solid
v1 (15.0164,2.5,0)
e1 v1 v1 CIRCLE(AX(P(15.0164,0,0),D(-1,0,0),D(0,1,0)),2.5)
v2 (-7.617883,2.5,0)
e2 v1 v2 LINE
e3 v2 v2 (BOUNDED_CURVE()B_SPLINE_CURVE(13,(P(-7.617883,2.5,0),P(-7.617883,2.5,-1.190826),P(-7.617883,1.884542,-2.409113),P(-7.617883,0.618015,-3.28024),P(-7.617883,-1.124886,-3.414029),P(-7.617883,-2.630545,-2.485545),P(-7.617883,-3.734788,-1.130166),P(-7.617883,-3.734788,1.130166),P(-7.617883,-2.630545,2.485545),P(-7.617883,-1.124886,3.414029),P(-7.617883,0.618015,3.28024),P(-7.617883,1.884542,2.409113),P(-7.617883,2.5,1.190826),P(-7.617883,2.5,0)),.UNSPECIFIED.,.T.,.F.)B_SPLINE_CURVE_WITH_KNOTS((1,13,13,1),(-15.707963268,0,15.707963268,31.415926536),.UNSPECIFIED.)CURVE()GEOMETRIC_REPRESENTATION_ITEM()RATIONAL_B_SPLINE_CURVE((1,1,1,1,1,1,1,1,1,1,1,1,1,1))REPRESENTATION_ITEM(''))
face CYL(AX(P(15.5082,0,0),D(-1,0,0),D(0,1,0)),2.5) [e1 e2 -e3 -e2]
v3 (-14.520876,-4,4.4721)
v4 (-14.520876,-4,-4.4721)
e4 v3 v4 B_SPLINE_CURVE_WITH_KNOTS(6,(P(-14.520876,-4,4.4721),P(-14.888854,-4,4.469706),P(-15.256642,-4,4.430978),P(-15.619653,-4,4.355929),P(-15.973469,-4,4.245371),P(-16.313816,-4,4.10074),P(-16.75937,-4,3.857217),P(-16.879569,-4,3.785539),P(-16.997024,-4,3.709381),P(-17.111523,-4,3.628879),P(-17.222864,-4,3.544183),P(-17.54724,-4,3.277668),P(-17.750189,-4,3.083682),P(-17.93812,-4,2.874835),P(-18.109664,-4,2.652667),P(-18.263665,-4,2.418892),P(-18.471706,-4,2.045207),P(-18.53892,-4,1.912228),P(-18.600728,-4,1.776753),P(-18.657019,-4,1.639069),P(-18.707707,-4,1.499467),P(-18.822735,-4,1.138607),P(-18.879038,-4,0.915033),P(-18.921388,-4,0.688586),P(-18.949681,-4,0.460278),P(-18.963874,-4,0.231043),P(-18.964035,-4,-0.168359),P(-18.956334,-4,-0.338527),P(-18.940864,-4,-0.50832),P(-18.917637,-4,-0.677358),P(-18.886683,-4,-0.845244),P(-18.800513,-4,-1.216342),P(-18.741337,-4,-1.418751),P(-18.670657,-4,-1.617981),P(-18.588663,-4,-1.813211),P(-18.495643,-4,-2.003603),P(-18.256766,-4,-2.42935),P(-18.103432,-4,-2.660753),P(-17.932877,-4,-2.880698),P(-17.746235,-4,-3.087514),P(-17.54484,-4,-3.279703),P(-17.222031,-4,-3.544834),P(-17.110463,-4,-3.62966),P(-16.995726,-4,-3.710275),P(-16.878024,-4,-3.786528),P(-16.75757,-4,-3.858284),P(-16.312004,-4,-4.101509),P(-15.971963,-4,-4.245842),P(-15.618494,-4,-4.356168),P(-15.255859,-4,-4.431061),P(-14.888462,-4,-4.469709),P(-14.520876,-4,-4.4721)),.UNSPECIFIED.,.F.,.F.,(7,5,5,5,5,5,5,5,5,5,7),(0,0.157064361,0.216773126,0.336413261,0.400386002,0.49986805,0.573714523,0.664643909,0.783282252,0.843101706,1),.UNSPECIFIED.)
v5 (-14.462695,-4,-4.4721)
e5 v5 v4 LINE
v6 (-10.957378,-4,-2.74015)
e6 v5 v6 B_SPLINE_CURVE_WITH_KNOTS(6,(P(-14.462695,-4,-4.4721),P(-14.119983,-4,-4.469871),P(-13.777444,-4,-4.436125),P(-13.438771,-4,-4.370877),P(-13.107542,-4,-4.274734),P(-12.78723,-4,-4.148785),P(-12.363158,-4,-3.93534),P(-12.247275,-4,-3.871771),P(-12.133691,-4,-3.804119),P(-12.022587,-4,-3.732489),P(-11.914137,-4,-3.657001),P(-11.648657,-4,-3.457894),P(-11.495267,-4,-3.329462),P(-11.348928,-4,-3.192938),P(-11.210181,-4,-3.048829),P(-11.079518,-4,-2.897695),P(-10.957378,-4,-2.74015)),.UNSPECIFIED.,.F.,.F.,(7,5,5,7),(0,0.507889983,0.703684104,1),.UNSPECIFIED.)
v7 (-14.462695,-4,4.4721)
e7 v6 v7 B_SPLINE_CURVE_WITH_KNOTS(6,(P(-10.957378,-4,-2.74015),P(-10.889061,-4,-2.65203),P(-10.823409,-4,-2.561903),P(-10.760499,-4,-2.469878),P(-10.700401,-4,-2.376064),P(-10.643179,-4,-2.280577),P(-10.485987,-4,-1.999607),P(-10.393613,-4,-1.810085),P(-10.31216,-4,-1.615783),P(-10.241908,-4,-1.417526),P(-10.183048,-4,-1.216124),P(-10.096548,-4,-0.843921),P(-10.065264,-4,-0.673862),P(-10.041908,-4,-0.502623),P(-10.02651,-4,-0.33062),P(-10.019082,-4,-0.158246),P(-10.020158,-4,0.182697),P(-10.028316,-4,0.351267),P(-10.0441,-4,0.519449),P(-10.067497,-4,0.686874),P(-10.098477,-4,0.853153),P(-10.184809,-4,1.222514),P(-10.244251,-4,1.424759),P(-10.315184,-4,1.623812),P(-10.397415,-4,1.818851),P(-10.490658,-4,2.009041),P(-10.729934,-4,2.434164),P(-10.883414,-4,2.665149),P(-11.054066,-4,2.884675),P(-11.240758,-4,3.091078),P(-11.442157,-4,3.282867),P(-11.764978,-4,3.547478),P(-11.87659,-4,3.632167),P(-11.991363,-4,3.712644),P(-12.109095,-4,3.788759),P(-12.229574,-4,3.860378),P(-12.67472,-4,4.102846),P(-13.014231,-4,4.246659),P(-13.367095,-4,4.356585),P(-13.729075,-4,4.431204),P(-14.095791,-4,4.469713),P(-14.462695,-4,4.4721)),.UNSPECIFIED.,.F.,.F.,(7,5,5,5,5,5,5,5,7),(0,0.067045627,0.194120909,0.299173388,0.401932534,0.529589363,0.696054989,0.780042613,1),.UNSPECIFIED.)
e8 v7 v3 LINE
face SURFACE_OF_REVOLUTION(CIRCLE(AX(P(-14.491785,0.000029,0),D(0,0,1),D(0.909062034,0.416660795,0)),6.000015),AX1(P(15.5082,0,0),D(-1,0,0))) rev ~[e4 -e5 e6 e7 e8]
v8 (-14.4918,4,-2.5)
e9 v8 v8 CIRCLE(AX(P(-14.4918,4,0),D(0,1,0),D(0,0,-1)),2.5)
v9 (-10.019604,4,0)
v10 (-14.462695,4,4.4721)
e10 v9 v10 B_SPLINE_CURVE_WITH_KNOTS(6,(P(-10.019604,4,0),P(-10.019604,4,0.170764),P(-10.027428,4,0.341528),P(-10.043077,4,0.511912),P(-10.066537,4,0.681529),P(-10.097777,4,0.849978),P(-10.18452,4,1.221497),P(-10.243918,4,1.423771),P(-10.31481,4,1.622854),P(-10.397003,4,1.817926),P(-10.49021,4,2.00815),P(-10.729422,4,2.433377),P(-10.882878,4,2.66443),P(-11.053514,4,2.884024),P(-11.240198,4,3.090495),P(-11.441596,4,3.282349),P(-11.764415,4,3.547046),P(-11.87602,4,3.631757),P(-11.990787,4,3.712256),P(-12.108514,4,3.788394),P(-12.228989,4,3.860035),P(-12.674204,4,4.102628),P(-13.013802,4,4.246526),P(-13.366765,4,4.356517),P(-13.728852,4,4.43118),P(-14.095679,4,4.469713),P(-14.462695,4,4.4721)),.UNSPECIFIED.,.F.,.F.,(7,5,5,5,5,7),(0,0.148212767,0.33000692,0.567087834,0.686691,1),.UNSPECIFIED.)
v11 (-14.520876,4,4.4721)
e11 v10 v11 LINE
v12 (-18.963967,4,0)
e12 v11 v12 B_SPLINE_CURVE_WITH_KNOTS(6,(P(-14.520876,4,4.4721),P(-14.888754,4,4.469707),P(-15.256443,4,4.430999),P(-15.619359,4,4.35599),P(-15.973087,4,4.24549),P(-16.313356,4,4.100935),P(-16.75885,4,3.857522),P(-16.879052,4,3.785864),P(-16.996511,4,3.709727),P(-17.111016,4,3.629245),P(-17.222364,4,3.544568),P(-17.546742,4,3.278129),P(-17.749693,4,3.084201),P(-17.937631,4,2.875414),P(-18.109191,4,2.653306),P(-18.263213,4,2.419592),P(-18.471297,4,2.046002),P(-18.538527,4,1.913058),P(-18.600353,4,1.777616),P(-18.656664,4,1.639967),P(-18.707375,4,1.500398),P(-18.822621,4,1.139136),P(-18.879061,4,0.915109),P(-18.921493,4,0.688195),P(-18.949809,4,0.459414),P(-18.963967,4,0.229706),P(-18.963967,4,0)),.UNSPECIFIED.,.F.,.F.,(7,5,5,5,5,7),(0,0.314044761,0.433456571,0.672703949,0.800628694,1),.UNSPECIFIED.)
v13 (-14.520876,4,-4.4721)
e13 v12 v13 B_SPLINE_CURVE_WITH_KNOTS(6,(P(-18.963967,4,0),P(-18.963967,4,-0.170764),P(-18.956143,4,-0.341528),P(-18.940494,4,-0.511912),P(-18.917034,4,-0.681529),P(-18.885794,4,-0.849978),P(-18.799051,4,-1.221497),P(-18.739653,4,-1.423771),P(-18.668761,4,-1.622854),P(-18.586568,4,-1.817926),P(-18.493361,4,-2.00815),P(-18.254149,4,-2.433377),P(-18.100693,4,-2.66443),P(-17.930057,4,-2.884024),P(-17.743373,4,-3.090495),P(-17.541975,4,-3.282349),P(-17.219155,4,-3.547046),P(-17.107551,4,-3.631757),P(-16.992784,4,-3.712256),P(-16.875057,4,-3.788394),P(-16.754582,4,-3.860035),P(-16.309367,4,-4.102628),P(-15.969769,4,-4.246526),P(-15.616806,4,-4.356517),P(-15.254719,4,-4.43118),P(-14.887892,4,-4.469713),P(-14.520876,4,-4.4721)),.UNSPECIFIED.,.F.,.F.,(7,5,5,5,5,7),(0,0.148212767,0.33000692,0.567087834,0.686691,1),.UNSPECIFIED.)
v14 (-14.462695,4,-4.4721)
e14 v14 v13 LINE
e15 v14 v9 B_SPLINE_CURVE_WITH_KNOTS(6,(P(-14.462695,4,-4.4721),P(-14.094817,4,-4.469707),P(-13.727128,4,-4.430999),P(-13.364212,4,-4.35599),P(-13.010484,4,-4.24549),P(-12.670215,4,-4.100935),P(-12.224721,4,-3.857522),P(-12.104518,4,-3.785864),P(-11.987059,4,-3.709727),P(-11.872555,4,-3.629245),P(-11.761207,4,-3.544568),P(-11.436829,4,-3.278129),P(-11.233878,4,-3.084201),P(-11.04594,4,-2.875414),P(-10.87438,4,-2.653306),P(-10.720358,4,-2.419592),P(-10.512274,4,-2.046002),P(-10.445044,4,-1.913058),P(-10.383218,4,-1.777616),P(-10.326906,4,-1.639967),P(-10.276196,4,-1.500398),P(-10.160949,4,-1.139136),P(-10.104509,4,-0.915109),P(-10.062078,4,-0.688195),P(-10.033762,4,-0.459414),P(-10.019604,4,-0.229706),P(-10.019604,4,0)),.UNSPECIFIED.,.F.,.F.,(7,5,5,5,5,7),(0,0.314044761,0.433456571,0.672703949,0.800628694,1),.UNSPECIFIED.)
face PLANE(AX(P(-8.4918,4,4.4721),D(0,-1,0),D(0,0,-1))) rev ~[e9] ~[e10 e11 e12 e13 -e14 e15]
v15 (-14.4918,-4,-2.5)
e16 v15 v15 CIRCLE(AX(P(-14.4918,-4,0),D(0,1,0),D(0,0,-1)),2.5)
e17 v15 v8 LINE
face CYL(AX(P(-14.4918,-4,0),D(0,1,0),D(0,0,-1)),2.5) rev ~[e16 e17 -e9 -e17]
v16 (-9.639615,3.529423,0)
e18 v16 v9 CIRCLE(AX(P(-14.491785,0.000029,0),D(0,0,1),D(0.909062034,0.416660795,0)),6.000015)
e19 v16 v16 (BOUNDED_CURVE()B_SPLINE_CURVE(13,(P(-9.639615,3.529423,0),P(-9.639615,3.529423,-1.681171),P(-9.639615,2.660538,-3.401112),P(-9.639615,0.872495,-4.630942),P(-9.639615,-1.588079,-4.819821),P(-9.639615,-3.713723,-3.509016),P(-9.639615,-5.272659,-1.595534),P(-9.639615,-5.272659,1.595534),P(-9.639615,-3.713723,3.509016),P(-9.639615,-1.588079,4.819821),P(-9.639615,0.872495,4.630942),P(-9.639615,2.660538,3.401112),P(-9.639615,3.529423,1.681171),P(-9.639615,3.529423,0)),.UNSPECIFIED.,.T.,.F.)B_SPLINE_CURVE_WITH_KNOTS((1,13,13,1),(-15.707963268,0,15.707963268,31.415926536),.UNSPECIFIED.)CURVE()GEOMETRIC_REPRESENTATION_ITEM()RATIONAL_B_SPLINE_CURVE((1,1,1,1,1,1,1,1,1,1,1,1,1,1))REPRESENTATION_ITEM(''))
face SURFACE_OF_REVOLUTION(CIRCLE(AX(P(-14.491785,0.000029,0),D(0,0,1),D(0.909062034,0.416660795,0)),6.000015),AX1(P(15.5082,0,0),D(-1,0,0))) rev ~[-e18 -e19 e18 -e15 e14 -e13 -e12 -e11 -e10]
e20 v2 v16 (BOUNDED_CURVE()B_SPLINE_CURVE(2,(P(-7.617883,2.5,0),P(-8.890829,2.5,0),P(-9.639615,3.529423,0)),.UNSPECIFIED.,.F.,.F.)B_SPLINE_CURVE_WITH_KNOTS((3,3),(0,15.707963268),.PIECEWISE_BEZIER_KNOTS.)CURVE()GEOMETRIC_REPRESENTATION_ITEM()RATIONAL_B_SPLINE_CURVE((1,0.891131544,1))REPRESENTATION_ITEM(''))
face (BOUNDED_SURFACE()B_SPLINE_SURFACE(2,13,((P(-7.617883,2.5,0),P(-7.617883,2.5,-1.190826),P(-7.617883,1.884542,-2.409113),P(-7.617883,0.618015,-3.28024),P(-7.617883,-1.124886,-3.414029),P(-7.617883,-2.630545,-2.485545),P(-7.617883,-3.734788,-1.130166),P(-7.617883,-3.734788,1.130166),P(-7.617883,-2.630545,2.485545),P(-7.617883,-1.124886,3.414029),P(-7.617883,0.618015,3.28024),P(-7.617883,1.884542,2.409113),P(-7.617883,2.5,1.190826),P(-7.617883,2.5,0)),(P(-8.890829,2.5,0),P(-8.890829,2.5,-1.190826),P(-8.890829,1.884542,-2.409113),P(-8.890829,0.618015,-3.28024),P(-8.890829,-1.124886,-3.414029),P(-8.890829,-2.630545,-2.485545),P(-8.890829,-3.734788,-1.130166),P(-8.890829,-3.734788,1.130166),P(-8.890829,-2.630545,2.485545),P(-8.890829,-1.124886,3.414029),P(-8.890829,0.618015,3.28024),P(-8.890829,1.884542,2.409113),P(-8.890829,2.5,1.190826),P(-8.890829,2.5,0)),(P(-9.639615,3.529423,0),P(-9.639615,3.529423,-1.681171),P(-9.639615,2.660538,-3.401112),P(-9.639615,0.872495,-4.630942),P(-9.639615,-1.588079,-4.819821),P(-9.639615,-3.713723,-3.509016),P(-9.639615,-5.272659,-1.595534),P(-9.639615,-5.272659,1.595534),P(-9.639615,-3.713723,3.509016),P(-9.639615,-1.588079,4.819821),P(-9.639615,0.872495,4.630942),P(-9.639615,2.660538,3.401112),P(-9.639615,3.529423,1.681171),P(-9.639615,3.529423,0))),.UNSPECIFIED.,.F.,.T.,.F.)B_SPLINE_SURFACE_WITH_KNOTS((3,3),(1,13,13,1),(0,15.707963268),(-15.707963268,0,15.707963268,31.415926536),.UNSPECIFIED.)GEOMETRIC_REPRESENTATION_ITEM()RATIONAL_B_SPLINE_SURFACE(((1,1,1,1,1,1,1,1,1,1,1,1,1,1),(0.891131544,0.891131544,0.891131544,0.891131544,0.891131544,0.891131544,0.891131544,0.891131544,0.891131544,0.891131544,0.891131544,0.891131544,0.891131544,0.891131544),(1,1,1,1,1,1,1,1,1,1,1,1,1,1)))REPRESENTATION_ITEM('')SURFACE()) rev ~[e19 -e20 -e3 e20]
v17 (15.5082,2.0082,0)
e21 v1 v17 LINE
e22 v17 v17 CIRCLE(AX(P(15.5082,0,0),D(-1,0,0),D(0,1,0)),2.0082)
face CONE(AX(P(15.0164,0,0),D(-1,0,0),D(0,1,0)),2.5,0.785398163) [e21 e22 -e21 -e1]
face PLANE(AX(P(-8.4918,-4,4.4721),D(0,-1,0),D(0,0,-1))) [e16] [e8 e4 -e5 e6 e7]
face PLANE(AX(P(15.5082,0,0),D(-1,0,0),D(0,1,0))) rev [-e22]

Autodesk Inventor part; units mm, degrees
ref_plane "YZ Plane" through (0, 0, 0) normal (1, 0, 0) x (0, 1, 0)
ref_plane "XZ Plane" through (0, 0, 0) normal (0, 1, 0) x (-1, 0, 0)
sketch "Schizzo1" plane through (0, 0, 0) normal (0, 0, 1) x (1, 0, 0)
  line L0 (15.5082, 0) -> (15.5082, 2.5)
  line L1 (-0.4918, 2.5) -> (-9.0374, 2.5)
  line L2 (15.5082, 0) -> (-20.4918, 0)
  arc A0 (-9.0374, 2.5) -> (-20.4918, 0) centre (-14.4918, 0) ccw
  line L3 (-28.8997, 0) -> (22.9096, 0) projected
  line L4 (0, -1.4224) -> (0, 8.5344) projected
  line L5 (15.5082, 2.5) -> (0, 2.5)
  line L6 (0, 2.5) -> (-0.4918, 2.5)
  line L7 (0, 2.5) -> (0, 0) construction
  line L8 (0, 2.5) -> (-9.0374, 2.5) construction
  dimension "d0" = 6
  dimension "d1" = 5
  dimension "d2" = 30
  dimension "d10" = 16
  dimension "d11" = 0.4918
  dimension "d18" = 5
revolve "Corpo1" add sketch "Schizzo1" angle 360 about axis through (15.5082, 0, 0) along (-1, 0, 0)
ref_plane "IDS_WORKPLANE{1}" through (-8.4918, 0, 0) normal (1, 0, 0) x (0, 1, 0)
sketch "Schizzo2" plane through (-8.4918, 0, 0) normal (1, 0, 0) x (0, 1, 0)
  arc A0 (4, -4.4721) -> (4, 4.4721) centre (0, 0) ccw
  line L0 (4, 4.4721) -> (4, -4.4721)
  circle A1 centre (0, 0) radius 2.5 projected
  line L1 (0, 0) -> (0, 4.0115)
  arc A2 (-4, 4.4721) -> (-4, -4.4721) centre (0, 0) ccw
  line L2 (-4, 4.4721) -> (-4, -4.4721)
  dimension "d3" = 12
  dimension "d4" = 4
extrude "Corpo2" cut sketch "Schizzo2" against normal blind 12 contours L0 A0 | L2 A2
sketch "Schizzo3" plane through (-14.4918, -4, 0) normal (0, -1, 0) x (1, 0, 0)
  circle A0 centre (0, 0) radius 4.4721 projected
hole "Occhiello" at (-14.4918, -4, 0) direction (0, 1, 0) diameter 5 end through all
fillet "Raccordo1" radius 2.5 1 edges at (-9.0374, -2.5, 0)
thread "Filettatura" size "M5x0.8" class "6g" standard "ISO Metric profile" length 16
chamfer "Smusso1" distance 0.4918 angle 45 1 edges at (15.5082, -2.5, 0)
equation "\"d0\" = 0.5 * KOD"
equation "\"d1\" = BDM"
equation "\"d2\" = NLG"
equation "\"d10\" = GEL"
equation "\"d18\" = GD"
equation "\"d3\" = KOD"
equation "\"d4\" = 0.5 * SW"
equation "\"d5\" = KOD"
equation "\"d8\" = BOR"
equation "\"d9\" = RR"
equation "\"d21\" = GEL"
equation "\"NLG\" = 30"
equation "\"GD\" = NND"
equation "\"GAL\" = 0.61345 * PTC"
equation "\"GEL\" = 16"
equation "\"BDM\" = NND"
equation "\"KOD\" = 12"
equation "\"GUL\" = 0.61345 * PTC"
equation "\"SW\" = 8"
equation "\"BOR\" = 5"
equation "\"RR\" = 2.5"
equation "\"SPD\" = NND - 1.2269 * PTC"
equation "\"THREADDIA\" = 5"
equation "\"TOA\" = 30deg"
equation "\"FAWI\" = 45deg"
equation "\"PTC\" = 0.8"
equation "\"NND\" = 5"
equation "\"GD1\" = THREADDIA - 1.2269 * PTC"
properties part number "CNS 4490 - M5 x 30" material "Acciaio, Dolce"
